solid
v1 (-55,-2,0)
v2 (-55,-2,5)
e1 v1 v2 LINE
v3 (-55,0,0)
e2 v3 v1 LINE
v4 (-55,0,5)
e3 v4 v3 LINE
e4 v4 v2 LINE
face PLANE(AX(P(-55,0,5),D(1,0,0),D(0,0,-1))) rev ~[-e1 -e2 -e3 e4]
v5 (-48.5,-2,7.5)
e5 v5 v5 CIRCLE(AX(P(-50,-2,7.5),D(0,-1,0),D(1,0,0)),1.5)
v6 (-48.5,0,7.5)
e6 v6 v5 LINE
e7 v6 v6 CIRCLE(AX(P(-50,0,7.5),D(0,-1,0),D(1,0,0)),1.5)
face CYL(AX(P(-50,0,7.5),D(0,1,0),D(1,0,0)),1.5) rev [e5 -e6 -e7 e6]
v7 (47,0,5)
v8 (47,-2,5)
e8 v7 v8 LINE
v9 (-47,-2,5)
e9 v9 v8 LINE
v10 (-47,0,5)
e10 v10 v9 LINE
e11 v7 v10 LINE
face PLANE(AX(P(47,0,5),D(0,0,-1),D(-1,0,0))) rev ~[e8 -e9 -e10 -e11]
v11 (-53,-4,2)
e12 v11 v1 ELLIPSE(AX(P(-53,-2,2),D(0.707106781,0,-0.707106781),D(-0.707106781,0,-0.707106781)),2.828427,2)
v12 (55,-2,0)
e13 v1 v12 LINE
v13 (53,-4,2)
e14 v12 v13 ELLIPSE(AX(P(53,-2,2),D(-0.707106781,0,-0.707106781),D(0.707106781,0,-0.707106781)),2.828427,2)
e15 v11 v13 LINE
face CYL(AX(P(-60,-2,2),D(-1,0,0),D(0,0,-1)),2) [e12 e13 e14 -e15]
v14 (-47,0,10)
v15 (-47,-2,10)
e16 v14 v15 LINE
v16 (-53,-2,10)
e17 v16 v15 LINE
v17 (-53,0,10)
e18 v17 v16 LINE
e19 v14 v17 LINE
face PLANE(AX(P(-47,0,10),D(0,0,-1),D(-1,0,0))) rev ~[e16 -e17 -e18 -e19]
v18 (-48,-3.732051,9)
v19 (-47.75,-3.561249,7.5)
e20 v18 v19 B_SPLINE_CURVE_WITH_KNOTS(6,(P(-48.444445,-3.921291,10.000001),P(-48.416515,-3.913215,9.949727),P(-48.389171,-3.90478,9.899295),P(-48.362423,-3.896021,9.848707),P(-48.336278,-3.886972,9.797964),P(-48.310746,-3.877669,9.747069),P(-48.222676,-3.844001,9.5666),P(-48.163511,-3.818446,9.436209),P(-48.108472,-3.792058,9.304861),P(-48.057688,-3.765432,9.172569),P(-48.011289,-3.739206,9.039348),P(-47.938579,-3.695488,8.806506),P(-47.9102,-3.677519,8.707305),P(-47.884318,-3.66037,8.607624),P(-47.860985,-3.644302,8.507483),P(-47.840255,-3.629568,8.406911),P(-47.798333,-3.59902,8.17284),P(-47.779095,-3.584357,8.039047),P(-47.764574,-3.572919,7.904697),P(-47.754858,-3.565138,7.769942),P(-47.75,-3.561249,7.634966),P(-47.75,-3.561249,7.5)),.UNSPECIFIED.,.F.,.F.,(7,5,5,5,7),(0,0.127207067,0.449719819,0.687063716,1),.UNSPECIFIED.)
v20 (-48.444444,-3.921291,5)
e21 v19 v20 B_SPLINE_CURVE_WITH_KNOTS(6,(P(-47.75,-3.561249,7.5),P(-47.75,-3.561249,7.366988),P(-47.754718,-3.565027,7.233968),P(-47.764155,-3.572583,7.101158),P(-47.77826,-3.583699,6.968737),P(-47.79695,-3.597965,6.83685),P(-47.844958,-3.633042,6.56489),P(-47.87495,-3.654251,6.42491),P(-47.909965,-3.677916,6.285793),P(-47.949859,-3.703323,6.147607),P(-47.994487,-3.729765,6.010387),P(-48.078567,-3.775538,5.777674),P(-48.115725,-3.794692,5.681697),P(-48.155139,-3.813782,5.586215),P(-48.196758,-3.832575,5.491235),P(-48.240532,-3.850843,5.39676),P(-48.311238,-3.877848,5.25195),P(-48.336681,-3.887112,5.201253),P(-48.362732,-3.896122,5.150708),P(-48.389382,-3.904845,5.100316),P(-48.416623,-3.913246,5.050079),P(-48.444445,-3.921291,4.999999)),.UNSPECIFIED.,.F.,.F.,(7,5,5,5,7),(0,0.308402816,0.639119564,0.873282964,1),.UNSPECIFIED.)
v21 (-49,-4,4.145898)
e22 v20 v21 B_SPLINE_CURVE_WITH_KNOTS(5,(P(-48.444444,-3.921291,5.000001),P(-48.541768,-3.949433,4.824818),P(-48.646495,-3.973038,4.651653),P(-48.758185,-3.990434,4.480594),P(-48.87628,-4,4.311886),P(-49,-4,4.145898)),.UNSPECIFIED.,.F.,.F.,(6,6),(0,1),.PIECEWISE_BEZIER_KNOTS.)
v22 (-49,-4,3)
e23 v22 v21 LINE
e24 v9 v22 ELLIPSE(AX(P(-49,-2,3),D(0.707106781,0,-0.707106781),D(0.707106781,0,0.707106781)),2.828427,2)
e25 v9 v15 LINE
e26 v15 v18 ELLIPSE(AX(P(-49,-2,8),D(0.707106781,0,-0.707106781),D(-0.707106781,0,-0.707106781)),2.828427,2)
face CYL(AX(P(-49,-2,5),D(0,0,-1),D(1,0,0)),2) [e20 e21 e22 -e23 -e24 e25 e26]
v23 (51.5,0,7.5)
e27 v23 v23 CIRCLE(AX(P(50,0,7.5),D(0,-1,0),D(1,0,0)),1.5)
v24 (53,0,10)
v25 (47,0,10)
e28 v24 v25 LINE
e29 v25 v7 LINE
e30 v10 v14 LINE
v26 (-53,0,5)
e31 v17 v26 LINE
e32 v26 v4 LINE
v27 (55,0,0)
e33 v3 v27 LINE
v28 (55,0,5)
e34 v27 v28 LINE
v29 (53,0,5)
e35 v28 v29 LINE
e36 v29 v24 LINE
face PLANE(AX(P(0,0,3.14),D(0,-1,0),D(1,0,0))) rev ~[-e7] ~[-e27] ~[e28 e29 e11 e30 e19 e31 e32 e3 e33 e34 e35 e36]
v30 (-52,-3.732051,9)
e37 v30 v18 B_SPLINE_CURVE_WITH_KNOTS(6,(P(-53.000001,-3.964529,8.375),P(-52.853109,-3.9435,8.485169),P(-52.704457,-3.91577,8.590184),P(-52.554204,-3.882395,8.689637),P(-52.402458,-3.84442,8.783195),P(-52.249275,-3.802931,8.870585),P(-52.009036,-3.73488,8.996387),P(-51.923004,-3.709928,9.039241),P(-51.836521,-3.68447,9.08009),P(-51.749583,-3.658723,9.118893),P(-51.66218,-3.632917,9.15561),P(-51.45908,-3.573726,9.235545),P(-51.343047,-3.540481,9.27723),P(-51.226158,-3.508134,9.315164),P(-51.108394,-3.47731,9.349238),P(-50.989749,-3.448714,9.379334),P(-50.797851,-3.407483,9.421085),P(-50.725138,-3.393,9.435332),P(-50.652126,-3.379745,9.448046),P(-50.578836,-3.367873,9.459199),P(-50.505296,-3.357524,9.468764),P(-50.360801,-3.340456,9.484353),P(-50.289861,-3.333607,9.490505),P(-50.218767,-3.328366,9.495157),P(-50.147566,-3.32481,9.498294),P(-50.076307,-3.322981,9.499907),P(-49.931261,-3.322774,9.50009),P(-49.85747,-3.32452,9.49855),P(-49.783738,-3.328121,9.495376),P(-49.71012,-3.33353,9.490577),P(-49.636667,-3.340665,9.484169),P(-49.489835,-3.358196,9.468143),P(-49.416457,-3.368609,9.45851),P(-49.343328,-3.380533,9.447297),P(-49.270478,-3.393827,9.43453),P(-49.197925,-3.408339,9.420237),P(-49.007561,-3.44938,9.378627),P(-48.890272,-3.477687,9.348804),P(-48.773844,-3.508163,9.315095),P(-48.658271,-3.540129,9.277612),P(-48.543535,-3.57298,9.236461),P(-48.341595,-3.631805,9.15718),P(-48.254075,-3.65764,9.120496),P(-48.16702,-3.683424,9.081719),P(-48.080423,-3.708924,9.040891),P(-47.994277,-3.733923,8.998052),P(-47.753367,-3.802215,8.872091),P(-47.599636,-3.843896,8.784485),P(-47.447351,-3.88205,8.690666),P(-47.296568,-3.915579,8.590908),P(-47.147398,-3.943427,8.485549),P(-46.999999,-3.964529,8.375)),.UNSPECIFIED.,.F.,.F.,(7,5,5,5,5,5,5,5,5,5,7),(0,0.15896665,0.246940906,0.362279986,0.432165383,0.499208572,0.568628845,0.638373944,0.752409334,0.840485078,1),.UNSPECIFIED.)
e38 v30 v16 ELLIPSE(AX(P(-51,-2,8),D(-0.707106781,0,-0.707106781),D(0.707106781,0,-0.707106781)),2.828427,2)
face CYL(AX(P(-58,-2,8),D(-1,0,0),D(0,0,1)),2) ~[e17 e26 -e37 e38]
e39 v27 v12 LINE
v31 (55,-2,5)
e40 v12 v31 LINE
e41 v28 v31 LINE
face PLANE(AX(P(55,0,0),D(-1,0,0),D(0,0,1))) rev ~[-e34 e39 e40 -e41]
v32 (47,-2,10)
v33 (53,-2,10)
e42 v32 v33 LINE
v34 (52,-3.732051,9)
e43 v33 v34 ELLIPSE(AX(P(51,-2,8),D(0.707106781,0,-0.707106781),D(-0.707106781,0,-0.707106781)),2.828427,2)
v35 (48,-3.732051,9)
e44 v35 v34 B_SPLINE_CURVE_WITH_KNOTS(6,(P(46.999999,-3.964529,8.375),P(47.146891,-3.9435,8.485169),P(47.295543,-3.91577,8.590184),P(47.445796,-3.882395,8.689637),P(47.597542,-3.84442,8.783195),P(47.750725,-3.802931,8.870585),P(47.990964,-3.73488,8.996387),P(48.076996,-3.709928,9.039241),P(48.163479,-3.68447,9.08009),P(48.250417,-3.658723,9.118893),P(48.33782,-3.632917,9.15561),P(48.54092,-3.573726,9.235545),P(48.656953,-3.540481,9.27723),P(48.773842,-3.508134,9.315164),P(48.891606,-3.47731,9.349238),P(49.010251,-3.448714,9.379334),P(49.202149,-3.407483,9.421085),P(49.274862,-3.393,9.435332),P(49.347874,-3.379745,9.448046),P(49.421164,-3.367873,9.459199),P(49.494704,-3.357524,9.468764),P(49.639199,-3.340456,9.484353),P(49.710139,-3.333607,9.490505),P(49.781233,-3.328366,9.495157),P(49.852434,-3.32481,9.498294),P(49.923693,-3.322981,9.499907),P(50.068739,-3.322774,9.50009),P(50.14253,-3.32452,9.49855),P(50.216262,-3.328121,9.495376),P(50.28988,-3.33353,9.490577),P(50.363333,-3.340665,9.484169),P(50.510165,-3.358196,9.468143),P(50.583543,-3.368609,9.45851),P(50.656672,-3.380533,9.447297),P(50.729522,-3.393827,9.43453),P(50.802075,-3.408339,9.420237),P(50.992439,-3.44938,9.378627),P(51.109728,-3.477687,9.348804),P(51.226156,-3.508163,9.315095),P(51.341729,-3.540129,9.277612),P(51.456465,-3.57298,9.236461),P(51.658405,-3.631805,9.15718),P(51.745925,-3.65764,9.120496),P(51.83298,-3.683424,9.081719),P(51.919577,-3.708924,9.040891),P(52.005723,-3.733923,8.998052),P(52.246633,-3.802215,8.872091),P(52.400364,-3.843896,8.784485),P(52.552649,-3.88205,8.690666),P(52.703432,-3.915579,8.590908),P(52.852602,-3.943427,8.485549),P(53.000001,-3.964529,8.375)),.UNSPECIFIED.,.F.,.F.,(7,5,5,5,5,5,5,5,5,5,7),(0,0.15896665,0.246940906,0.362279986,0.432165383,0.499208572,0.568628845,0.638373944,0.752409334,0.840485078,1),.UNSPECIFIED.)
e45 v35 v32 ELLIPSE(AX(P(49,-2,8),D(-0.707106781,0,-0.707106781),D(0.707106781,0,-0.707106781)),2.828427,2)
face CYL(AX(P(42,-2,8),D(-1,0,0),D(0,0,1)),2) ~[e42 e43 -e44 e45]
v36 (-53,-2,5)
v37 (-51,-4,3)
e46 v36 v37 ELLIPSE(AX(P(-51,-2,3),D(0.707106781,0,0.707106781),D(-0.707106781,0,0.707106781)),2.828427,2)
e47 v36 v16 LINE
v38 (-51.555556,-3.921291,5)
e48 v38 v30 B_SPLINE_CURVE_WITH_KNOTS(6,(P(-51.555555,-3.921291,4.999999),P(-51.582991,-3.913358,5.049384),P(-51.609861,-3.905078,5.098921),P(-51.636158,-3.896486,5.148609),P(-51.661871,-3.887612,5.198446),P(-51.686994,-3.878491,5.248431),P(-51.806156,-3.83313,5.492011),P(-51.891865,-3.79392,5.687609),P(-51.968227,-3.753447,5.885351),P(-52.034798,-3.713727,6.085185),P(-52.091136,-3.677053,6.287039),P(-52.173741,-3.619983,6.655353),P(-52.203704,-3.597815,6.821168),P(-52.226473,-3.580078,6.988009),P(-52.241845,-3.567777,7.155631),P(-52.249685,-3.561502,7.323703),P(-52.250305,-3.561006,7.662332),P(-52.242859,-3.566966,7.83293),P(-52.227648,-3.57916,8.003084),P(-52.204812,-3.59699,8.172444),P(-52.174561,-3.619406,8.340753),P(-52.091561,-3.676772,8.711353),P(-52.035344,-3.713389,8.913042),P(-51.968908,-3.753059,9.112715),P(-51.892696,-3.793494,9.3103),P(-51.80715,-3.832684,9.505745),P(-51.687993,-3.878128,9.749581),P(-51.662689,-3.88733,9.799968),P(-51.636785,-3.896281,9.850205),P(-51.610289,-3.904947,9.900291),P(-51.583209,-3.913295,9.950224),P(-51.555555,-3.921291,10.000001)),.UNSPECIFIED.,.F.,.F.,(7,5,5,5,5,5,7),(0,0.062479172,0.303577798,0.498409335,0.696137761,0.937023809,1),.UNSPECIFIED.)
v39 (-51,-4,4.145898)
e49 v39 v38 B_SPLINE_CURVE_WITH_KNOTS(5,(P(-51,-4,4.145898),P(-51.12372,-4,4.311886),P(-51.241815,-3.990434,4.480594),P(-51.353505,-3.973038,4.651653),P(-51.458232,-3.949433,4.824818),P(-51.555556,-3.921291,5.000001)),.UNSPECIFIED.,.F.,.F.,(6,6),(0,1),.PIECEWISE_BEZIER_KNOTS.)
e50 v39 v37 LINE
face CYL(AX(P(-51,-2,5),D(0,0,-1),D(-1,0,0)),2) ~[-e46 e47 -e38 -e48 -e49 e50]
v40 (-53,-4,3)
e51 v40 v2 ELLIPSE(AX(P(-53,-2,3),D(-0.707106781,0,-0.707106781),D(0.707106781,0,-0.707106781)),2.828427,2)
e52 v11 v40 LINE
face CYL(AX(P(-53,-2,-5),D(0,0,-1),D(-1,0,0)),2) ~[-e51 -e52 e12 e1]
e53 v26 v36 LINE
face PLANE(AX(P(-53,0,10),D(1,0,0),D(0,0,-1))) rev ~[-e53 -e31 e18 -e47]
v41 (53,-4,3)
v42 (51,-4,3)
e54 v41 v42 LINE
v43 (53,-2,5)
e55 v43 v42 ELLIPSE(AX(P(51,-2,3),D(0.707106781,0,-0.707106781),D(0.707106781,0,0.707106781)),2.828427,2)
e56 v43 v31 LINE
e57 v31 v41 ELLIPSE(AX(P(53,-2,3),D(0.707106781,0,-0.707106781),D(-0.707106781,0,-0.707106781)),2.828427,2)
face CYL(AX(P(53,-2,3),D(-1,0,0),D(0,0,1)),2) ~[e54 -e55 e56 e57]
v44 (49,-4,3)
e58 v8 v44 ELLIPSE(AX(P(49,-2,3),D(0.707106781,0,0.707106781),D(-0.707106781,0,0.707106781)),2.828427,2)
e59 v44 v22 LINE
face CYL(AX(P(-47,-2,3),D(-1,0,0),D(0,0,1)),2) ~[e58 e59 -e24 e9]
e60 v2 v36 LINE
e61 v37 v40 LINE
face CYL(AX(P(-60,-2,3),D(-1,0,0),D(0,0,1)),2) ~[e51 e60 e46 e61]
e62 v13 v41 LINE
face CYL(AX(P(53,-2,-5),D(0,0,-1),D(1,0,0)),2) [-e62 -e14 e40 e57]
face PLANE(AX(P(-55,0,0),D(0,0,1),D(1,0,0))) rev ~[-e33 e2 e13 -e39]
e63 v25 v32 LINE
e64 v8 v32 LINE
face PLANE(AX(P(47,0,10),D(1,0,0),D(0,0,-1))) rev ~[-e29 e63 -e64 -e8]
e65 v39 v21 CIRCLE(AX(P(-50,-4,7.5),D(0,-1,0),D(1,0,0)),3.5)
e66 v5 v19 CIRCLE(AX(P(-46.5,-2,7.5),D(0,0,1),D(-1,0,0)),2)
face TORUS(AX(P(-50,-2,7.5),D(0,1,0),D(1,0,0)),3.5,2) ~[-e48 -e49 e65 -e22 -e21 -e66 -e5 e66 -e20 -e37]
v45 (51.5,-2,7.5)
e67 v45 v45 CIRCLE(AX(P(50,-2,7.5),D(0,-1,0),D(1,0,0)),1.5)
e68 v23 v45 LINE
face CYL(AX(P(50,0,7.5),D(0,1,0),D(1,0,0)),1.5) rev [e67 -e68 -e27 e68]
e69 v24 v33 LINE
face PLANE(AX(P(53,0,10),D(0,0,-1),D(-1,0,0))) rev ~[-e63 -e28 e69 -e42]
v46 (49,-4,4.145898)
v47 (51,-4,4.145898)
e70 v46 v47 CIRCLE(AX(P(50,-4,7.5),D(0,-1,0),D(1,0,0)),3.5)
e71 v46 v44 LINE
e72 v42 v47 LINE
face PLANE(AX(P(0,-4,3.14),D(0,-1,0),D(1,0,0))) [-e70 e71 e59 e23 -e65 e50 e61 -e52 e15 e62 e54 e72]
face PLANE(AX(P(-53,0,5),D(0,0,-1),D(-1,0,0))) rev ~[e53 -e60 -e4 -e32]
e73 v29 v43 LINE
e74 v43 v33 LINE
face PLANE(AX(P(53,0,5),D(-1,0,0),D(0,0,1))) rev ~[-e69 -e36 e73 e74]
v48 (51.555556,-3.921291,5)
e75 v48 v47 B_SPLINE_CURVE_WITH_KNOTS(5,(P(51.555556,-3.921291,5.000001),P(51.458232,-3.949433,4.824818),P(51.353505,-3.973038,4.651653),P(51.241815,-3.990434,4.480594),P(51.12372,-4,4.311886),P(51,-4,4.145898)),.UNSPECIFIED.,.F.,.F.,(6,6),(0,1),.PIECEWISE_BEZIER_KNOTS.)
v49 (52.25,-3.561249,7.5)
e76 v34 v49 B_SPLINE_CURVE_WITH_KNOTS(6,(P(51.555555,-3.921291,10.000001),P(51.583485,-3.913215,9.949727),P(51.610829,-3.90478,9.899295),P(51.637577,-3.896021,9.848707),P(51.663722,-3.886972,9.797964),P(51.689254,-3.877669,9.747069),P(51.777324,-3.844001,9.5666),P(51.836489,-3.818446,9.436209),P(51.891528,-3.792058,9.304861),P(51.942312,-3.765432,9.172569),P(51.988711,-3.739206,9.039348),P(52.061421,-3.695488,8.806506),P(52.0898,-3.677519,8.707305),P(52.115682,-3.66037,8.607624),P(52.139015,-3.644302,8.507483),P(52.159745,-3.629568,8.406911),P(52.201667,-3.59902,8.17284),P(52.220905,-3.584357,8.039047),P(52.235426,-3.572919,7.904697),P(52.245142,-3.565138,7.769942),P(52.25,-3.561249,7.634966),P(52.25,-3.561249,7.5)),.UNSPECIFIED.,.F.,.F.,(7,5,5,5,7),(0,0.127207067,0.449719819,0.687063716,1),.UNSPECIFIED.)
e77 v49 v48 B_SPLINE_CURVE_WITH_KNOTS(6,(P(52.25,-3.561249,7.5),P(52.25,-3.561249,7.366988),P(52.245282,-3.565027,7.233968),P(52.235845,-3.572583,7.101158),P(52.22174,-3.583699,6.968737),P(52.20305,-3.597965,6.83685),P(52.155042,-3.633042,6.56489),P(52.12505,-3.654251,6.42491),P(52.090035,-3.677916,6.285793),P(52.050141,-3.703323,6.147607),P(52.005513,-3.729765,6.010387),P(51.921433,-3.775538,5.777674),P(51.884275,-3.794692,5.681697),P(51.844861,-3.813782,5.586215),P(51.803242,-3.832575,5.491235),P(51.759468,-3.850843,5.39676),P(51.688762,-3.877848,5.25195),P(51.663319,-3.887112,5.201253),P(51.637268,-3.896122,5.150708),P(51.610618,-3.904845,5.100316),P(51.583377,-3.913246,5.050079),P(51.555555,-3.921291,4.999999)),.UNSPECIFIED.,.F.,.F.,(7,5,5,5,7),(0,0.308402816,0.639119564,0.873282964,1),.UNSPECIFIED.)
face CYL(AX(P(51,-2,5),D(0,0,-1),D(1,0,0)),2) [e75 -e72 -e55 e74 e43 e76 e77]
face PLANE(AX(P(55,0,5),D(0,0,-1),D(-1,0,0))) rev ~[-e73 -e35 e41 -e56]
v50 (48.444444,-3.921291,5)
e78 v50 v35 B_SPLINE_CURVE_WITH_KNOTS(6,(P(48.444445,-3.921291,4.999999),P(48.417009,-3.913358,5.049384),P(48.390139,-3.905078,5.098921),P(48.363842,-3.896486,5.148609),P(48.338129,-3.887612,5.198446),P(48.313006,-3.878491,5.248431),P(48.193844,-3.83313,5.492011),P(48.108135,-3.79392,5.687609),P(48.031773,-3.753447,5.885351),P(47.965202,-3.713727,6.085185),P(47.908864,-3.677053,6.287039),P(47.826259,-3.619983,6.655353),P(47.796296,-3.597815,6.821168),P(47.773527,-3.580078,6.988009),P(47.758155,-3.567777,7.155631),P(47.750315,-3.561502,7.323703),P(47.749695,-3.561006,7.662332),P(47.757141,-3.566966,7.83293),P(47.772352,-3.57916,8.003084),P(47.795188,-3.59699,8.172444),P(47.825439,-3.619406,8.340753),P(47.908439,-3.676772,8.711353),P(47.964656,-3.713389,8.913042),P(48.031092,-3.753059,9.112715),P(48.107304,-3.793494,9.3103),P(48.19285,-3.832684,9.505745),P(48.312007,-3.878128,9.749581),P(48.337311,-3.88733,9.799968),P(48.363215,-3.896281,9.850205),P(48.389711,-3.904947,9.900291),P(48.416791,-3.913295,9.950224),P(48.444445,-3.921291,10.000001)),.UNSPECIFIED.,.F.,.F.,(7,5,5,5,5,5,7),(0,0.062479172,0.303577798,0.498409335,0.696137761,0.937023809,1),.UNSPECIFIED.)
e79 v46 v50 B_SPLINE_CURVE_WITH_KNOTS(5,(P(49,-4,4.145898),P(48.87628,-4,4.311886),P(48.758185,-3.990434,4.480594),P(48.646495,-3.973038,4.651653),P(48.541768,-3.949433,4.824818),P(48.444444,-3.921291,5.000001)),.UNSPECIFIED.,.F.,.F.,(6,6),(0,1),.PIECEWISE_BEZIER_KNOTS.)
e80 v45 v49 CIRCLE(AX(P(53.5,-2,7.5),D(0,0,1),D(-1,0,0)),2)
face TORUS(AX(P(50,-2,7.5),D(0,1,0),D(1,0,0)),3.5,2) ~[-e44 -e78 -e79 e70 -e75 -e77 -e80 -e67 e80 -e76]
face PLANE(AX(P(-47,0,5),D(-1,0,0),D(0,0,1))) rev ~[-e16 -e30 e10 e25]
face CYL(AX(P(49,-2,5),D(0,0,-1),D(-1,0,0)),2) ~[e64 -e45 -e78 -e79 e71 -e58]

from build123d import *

# Parameters (mm, degrees)
F0_R         = 1.5
F1_DEPTH     = 4
F2_T1_DEPTH  = 15
F2_T3_DEPTH  = 120
F2_T5_DEPTH  = 7
F2_T7_DEPTH  = 10
F2_T9_DEPTH  = 16
F2_T11_DEPTH = 94
F2_T13_DEPTH = 16
F2_T15_DEPTH = 7
F2_T25_DEPTH = 12
F2_T29_DEPTH = 15
F2_T36_DEPTH = 15
F2_T40_DEPTH = 99
F2_T47_DEPTH = 99
F2_T51_DEPTH = 15
F2_T58_DEPTH = 15
F2_T62_DEPTH = 12


# Not quite as in the source:
# - a fillet or chamfer that OpenCascade refuses, or shapes differently, is made with other operations: its cross-section is extruded or revolved along the edge and cut away or added


with BuildPart() as f1:
    # F0 (on Front) → F1 (new body)
    with BuildSketch(Plane.XZ):
        Polygon((-55, 5), (-55, 0), (55, 0), (55, 5), (53, 5), (53, 10), (47, 10), (47, 5), (-47, 5), (-47, 10), (-53, 10), (-53, 5), align=None)
        with Locations((-50, 7.5)):
            Circle(F0_R, mode=Mode.SUBTRACT)
        with Locations((50, 7.5)):
            Circle(F0_R, mode=Mode.SUBTRACT)
    extrude(amount=F1_DEPTH)

    # F2: fillet of radius 2 on 14 edges, made by hand

    # F2_s2 → F2_t1 (cut)
    with BuildSketch(Plane.XY.offset(-5)):
        with BuildLine():
            ThreePointArc((-55, -2), (-54.4142135624, -3.4142135624), (-53, -4))
            Line((-53, -4), (-55, -4))
            Line((-55, -4), (-55, -2))
        make_face()
        with BuildLine():
            ThreePointArc((55, -2), (54.4142135624, -3.4142135624), (53, -4))
            Line((53, -4), (55, -4))
            Line((55, -4), (55, -2))
        make_face()
    extrude(amount=F2_T1_DEPTH, mode=Mode.SUBTRACT)

    # F2_s4 → F2_t3 (cut)
    with BuildSketch(Plane.YZ.offset(-60)):
        with BuildLine():
            ThreePointArc((-2, 0), (-3.4142135624, 0.5857864376), (-4, 2))
            Line((-4, 2), (-4, 0))
            Line((-4, 0), (-2, 0))
        make_face()
    extrude(amount=F2_T3_DEPTH, mode=Mode.SUBTRACT)

    # F2_s6 → F2_t5 (cut)
    with BuildSketch(Plane.YZ.offset(53)):
        with BuildLine():
            ThreePointArc((-2, 5), (-3.4142135624, 4.4142135624), (-4, 3))
            Line((-4, 3), (-4, 5))
            Line((-4, 5), (-2, 5))
        make_face()
    extrude(amount=F2_T5_DEPTH, mode=Mode.SUBTRACT)

    # F2_s8 → F2_t7 (cut)
    with BuildSketch(Plane.XY.offset(5)):
        with BuildLine():
            ThreePointArc((53, -2), (52.4142135624, -3.4142135624), (51, -4))
            Line((51, -4), (53, -4))
            Line((53, -4), (53, -2))
        make_face()
        with BuildLine():
            ThreePointArc((47, -2), (47.5857864376, -3.4142135624), (49, -4))
            Line((49, -4), (47, -4))
            Line((47, -4), (47, -2))
        make_face()
        with BuildLine():
            ThreePointArc((-47, -2), (-47.5857864376, -3.4142135624), (-49, -4))
            Line((-49, -4), (-47, -4))
            Line((-47, -4), (-47, -2))
        make_face()
        with BuildLine():
            ThreePointArc((-53, -2), (-52.4142135624, -3.4142135624), (-51, -4))
            Line((-51, -4), (-53, -4))
            Line((-53, -4), (-53, -2))
        make_face()
    extrude(amount=F2_T7_DEPTH, mode=Mode.SUBTRACT)

    # F2_s10 → F2_t9 (cut)
    with BuildSketch(Plane.YZ.offset(42)):
        with BuildLine():
            ThreePointArc((-2, 10), (-3.4142135624, 9.4142135624), (-4, 8))
            Line((-4, 8), (-4, 10))
            Line((-4, 10), (-2, 10))
        make_face()
    extrude(amount=F2_T9_DEPTH, mode=Mode.SUBTRACT)

    # F2_s12 → F2_t11 (cut)
    with BuildSketch(Plane.YZ.offset(-47)):
        with BuildLine():
            ThreePointArc((-2, 5), (-3.4142135624, 4.4142135624), (-4, 3))
            Line((-4, 3), (-4, 5))
            Line((-4, 5), (-2, 5))
        make_face()
    extrude(amount=F2_T11_DEPTH, mode=Mode.SUBTRACT)

    # F2_s14 → F2_t13 (cut)
    with BuildSketch(Plane.YZ.offset(-58)):
        with BuildLine():
            ThreePointArc((-2, 10), (-3.4142135624, 9.4142135624), (-4, 8))
            Line((-4, 8), (-4, 10))
            Line((-4, 10), (-2, 10))
        make_face()
    extrude(amount=F2_T13_DEPTH, mode=Mode.SUBTRACT)

    # F2_s16 → F2_t15 (cut)
    with BuildSketch(Plane.YZ.offset(-60)):
        with BuildLine():
            ThreePointArc((-2, 5), (-3.4142135624, 4.4142135624), (-4, 3))
            Line((-4, 3), (-4, 5))
            Line((-4, 5), (-2, 5))
        make_face()
    extrude(amount=F2_T15_DEPTH, mode=Mode.SUBTRACT)

    # F2_s17 → F2_t18 (revolve, cut)
    with BuildSketch(Plane.XY.offset(7.5)):
        with BuildLine():
            ThreePointArc((-48.5, -2), (-47.9142135624, -3.4142135624), (-46.5, -4))
            Line((-46.5, -4), (-48.5, -4))
            Line((-48.5, -4), (-48.5, -2))
        make_face()
    revolve(axis=Axis((-50, -4, 7.5), (0, -1, 0)), mode=Mode.SUBTRACT)

    # F2_s19 → F2_t20 (revolve, cut)
    with BuildSketch(Plane.XY.offset(7.5)):
        with BuildLine():
            ThreePointArc((51.5, -2), (52.0857864376, -3.4142135624), (53.5, -4))
            Line((53.5, -4), (51.5, -4))
            Line((51.5, -4), (51.5, -2))
        make_face()
    revolve(axis=Axis((50, -4, 7.5), (0, -1, 0)), mode=Mode.SUBTRACT)


with BuildPart() as f2_tool23:
    # F2_s24 → F2_t25 (new body)
    with BuildSketch(Plane.YZ.offset(60)):
        with BuildLine():
            ThreePointArc((-2, 5), (-3.4142135624, 4.4142135624), (-4, 3))
            Line((-4, 3), (-4, 5))
            Line((-4, 5), (-2, 5))
        make_face()
    extrude(amount=-F2_T25_DEPTH)

    split(bisect_by=Plane.YZ.offset(53), keep=Keep.BOTTOM)


with BuildPart() as f2_tool27:
    # F2_s28 → F2_t29 (new body)
    with BuildSketch(Plane.XY):
        with BuildLine():
            ThreePointArc((53, -2), (52.4142135624, -3.4142135624), (51, -4))
            Line((51, -4), (53, -4))
            Line((53, -4), (53, -2))
        make_face()
    extrude(amount=F2_T29_DEPTH)

    split(bisect_by=Plane.XY.offset(5), keep=Keep.BOTTOM)


with BuildPart() as f2_tool23_1:
    add(f2_tool23.part)

    # F2_t31: intersect F2_tool27
    add(f2_tool27.part, mode=Mode.INTERSECT)


with BuildPart() as f1_1:
    add(f1.part)

    # F2_t21: cut F2_tool23
    add(f2_tool23_1.part, mode=Mode.SUBTRACT)


with BuildPart() as f2_tool34:
    # F2_s35 → F2_t36 (new body)
    with BuildSketch(Plane.XY.offset(15)):
        with BuildLine():
            ThreePointArc((47, -2), (47.5857864376, -3.4142135624), (49, -4))
            Line((49, -4), (47, -4))
            Line((47, -4), (47, -2))
        make_face()
    extrude(amount=-F2_T36_DEPTH)

    split(bisect_by=Plane.XY.offset(5), keep=Keep.BOTTOM)


with BuildPart() as f2_tool38:
    # F2_s39 → F2_t40 (new body)
    with BuildSketch(Plane.YZ.offset(52)):
        with BuildLine():
            ThreePointArc((-2, 5), (-3.4142135624, 4.4142135624), (-4, 3))
            Line((-4, 3), (-4, 5))
            Line((-4, 5), (-2, 5))
        make_face()
    extrude(amount=-F2_T40_DEPTH)

    split(bisect_by=Plane.YZ.offset(47), keep=Keep.TOP)


with BuildPart() as f2_tool34_1:
    add(f2_tool34.part)

    # F2_t42: intersect F2_tool38
    add(f2_tool38.part, mode=Mode.INTERSECT)


with BuildPart() as f1_2:
    add(f1_1.part)

    # F2_t32: cut F2_tool34
    add(f2_tool34_1.part, mode=Mode.SUBTRACT)


with BuildPart() as f2_tool45:
    # F2_s46 → F2_t47 (new body)
    with BuildSketch(Plane.YZ.offset(47)):
        with BuildLine():
            ThreePointArc((-2, 5), (-3.4142135624, 4.4142135624), (-4, 3))
            Line((-4, 3), (-4, 5))
            Line((-4, 5), (-2, 5))
        make_face()
    extrude(amount=-F2_T47_DEPTH)

    split(bisect_by=Plane.YZ.offset(-47), keep=Keep.BOTTOM)


with BuildPart() as f2_tool49:
    # F2_s50 → F2_t51 (new body)
    with BuildSketch(Plane.XY):
        with BuildLine():
            ThreePointArc((-47, -2), (-47.5857864376, -3.4142135624), (-49, -4))
            Line((-49, -4), (-47, -4))
            Line((-47, -4), (-47, -2))
        make_face()
    extrude(amount=F2_T51_DEPTH)

    split(bisect_by=Plane.XY.offset(5), keep=Keep.BOTTOM)


with BuildPart() as f2_tool45_1:
    add(f2_tool45.part)

    # F2_t53: intersect F2_tool49
    add(f2_tool49.part, mode=Mode.INTERSECT)


with BuildPart() as f1_3:
    add(f1_2.part)

    # F2_t43: cut F2_tool45
    add(f2_tool45_1.part, mode=Mode.SUBTRACT)


with BuildPart() as f2_tool56:
    # F2_s57 → F2_t58 (new body)
    with BuildSketch(Plane.XY.offset(15)):
        with BuildLine():
            ThreePointArc((-53, -2), (-52.4142135624, -3.4142135624), (-51, -4))
            Line((-51, -4), (-53, -4))
            Line((-53, -4), (-53, -2))
        make_face()
    extrude(amount=-F2_T58_DEPTH)

    split(bisect_by=Plane.XY.offset(5), keep=Keep.BOTTOM)


with BuildPart() as f2_tool60:
    # F2_s61 → F2_t62 (new body)
    with BuildSketch(Plane.YZ.offset(-48)):
        with BuildLine():
            ThreePointArc((-2, 5), (-3.4142135624, 4.4142135624), (-4, 3))
            Line((-4, 3), (-4, 5))
            Line((-4, 5), (-2, 5))
        make_face()
    extrude(amount=-F2_T62_DEPTH)

    split(bisect_by=Plane.YZ.offset(-53), keep=Keep.TOP)


with BuildPart() as f2_tool56_1:
    add(f2_tool56.part)

    # F2_t64: intersect F2_tool60
    add(f2_tool60.part, mode=Mode.INTERSECT)


with BuildPart() as f1_4:
    add(f1_3.part)

    # F2_t54: cut F2_tool56
    add(f2_tool56_1.part, mode=Mode.SUBTRACT)


solid = f1_4.part
